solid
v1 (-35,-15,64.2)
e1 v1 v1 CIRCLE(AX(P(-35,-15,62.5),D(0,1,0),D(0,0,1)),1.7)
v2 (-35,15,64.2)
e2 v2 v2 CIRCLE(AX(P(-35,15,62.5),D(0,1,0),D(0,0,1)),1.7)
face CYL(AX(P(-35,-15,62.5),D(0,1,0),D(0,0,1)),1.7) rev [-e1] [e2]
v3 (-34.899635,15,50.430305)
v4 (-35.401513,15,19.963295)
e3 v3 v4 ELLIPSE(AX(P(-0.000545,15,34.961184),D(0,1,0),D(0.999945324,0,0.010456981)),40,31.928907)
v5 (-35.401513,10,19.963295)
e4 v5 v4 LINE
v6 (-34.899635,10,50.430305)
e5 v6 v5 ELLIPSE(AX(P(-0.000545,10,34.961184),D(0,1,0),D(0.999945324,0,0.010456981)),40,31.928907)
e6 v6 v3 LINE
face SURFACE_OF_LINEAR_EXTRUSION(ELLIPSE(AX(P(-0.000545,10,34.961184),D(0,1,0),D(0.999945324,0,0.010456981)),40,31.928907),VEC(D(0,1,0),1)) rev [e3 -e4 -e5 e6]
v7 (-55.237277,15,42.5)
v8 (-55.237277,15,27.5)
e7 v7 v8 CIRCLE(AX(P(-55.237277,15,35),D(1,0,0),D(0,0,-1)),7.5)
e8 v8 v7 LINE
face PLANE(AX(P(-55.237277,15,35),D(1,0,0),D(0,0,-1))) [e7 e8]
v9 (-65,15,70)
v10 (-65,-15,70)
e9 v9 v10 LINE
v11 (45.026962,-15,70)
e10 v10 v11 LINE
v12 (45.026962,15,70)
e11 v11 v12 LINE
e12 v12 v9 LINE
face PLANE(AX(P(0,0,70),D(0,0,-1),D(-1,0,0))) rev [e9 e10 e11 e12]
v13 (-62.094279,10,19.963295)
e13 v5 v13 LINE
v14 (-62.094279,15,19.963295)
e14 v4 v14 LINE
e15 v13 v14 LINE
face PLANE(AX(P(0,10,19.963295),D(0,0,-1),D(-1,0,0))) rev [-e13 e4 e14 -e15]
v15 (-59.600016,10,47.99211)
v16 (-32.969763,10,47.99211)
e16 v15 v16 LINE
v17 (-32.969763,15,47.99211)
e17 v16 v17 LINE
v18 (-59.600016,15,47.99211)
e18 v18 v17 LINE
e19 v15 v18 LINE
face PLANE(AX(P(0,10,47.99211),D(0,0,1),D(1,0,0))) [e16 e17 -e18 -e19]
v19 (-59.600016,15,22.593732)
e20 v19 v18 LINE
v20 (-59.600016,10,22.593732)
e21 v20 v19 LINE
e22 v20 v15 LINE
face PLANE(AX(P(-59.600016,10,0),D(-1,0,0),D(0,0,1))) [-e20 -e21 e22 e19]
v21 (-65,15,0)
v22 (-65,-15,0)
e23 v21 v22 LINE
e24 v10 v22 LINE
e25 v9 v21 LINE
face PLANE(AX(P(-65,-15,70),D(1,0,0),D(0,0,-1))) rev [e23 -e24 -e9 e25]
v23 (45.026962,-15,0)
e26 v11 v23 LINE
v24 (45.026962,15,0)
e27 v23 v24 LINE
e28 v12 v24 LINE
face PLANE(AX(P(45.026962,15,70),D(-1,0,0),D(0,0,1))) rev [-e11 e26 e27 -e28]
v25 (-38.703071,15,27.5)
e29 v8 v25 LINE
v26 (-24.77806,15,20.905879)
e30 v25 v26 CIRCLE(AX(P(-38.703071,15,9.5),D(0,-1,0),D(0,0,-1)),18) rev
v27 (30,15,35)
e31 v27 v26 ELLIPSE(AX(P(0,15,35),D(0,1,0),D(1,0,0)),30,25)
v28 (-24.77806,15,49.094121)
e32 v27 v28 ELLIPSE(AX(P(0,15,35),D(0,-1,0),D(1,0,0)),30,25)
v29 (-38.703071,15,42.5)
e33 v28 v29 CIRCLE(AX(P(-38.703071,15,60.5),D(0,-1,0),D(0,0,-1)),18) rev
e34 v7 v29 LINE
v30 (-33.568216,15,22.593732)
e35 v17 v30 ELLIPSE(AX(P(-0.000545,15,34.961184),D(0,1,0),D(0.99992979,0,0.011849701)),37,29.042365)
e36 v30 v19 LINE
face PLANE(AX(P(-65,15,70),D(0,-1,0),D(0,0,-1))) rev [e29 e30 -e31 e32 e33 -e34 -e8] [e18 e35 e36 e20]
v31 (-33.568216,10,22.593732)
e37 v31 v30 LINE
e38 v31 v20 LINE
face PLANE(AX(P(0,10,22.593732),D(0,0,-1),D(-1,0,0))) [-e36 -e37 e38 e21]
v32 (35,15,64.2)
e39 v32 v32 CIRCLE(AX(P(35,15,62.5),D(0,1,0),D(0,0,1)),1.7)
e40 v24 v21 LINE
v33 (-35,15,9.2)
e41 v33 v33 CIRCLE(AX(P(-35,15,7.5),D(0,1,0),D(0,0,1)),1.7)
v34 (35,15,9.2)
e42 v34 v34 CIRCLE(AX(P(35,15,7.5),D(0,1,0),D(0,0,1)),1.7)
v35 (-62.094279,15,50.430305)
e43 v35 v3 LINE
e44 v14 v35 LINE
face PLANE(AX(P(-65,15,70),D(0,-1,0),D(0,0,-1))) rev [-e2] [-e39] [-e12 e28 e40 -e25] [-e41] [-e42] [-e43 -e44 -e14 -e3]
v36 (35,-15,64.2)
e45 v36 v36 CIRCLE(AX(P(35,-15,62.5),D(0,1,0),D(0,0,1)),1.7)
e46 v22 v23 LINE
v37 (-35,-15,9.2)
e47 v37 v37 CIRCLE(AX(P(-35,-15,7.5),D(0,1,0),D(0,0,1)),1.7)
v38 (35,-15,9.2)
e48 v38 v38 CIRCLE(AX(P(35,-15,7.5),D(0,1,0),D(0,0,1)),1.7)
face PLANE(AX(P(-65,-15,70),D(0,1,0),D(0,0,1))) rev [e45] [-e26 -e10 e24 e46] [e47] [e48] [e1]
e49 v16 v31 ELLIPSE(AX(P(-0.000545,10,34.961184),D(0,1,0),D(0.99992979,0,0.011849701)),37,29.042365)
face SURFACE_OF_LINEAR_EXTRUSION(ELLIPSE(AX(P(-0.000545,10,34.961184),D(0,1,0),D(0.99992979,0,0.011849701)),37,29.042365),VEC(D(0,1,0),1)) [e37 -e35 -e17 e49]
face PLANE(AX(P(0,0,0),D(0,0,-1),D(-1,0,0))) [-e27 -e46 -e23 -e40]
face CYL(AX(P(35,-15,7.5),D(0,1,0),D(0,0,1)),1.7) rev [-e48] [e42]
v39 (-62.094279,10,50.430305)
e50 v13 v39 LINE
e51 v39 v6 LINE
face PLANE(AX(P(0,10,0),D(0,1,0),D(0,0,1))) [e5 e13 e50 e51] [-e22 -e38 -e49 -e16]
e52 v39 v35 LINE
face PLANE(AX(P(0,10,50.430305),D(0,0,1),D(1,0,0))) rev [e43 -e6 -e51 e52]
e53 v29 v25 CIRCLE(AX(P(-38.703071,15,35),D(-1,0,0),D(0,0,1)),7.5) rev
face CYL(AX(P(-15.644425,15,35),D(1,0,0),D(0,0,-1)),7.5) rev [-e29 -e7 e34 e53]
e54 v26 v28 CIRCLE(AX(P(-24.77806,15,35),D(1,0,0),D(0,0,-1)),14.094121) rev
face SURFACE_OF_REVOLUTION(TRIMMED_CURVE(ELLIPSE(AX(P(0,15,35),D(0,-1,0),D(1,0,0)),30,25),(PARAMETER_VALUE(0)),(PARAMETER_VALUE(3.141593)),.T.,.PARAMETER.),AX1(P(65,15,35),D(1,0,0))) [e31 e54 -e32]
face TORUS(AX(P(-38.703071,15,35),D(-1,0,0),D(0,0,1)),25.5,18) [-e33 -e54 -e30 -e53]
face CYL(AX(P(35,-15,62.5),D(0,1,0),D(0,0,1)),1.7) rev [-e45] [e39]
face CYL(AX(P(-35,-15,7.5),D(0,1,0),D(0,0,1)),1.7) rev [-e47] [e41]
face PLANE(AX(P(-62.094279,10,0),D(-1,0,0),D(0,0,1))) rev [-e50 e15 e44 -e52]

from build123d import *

# Parameters (mm, degrees)
ESQUISSE1_W                              = 130
ESQUISSE1_H                              = 30
BOSS_EXTRU_1_DEPTH                       = 70
ENL_VEMENT_DE_MATI_RE_R_VOLUTION47_ANGLE = 180
ENL_VEMENT_START                         = -55.237277286
ENL_VEMENT_DE_MATI_RE_R_VOLUTION48_DEPTH = 26.619101243
CONG_1_R                                 = 18
ESQUISSE10_W                             = 19.973037842
ESQUISSE10_H                             = 30
ENL_V_MAT_EXTRU_2_DEPTH                  = 97.695398184
ENL_V_MAT_EXTRU_5_DEPTH                  = 5
ESQUISSE15_R                             = 1.7
ENL_V_MAT_EXTRU_7_DEPTH                  = 101.124922107


# Read off the part's stored shape, not the designer's step: Enlèvement de matière-Révolution48
with BuildPart() as part:
    # Esquisse1 → Boss.-Extru.1 (new body)
    with BuildSketch(Plane.XY):
        Rectangle(ESQUISSE1_W, ESQUISSE1_H)
    extrude(amount=BOSS_EXTRU_1_DEPTH)

    # Esquisse6 → Enlèvement de matière-Révolution47 (revolve, cut)
    with BuildSketch(Plane(origin=(0, 15, 0), x_dir=(1, 0, 0), z_dir=(0, 1, 0))):
        with BuildLine():
            Line((-30, -35), (30, -35))
            add(Edge.make_bspline(
                [(30, -35), (30, -10), (0, -10), (-30, -10), (-30, -35)],
                knots=[0, 0, 0, 1.570796327, 1.570796327, 3.141592654, 3.141592654, 3.141592654], degree=2, weights=[1, 0.707106781, 1, 0.707106781, 1]))
        make_face()
    revolve(axis=Axis((65, 15, 35), (-1, 0, 0)), revolution_arc=ENL_VEMENT_DE_MATI_RE_R_VOLUTION47_ANGLE, mode=Mode.SUBTRACT)

    # Enlèvement de matière-Révolution48 outli → Enlèvement de matière-Révolution48 (cut)
    with BuildSketch(Plane.YZ.offset(ENL_VEMENT_START)):
        with BuildLine():
            Line((15, 27.5), (15, 42.5))
            ThreePointArc((15, 42.5), (7.5, 35), (15, 27.5))
        make_face()
    extrude(amount=ENL_VEMENT_DE_MATI_RE_R_VOLUTION48_DEPTH, mode=Mode.SUBTRACT)

    # Congé1
    cong_1_edges = [part.edges().sort_by_distance(p)[0] for p in [
        (-28.618176043, 7.5, 35),
    ]]
    fillet(cong_1_edges, radius=CONG_1_R)

    # Esquisse10 → Enlèv. mat.-Extru.2 (cut, through all)
    with BuildSketch(Plane(origin=(0, 0, 0), x_dir=(-1, 0, 0), z_dir=(0, 0, -1))):
        with Locations((-55.013481079, 0)):
            Rectangle(ESQUISSE10_W, ESQUISSE10_H)
    extrude(amount=-ENL_V_MAT_EXTRU_2_DEPTH, mode=Mode.SUBTRACT)

    # Esquisse14 → Enlèv. mat.-Extru.5 (cut)
    with BuildSketch(Plane(origin=(0, 15, 0), x_dir=(1, 0, 0), z_dir=(0, 1, 0))):
        with BuildLine():
            Line((-36.95065792, -22.593731953), (-33.568216071, -22.593731953))
            add(Edge.make_bspline(
                [(-32.969763, -47.992109896), (-11.968044376, -80.456384186), (23.634832969, -57.413436774), (59.237710315, -34.370489362), (22.565908506, -12.048229698), (-14.105893303, 10.274029966), (-33.568216071, -22.593731953)],
                knots=[3.621962513, 3.621962513, 3.621962513, 5.414642661, 5.414642661, 7.207322809, 7.207322809, 9.000002957, 9.000002957, 9.000002957], degree=2, weights=[1, 0.624472717, 1, 0.624472717, 1, 0.624472717, 1]))
            Line((-32.969763, -47.992109896), (-36.439122288, -47.992109896))
            add(Edge.make_bspline(
                [(-36.439122288, -47.992109896), (-35.734455038, -49.237206185), (-34.899635372, -50.4303054)],
                knots=[3.575076272, 3.575076272, 3.575076272, 3.671550289, 3.671550289, 3.671550289], degree=2, weights=[1, 0.979509213, 0.961188751]))
            add(Edge.make_bspline(
                [(-34.899635372, -50.4303054), (-11.819428822, -83.415843998), (25.026969924, -59.963213412), (65.234193612, -34.371427073), (24.010934913, -9.515816182), (-13.543091018, 13.127426623), (-35.401513383, -19.963295045)],
                knots=[3.671550289, 3.671550289, 3.671550289, 5.396765185, 5.396765185, 7.218454098, 7.218454098, 8.937188842, 8.937188842, 8.937188842], degree=2, weights=[0.961188751, 0.633569616, 1, 0.613078829, 1, 0.634945981, 0.958737375]))
            add(Edge.make_bspline(
                [(-35.401513383, -19.963295045), (-36.251462308, -21.250003794), (-36.95065792, -22.593731953)],
                knots=[8.937188842, 8.937188842, 8.937188842, 9.04014301, 9.04014301, 9.04014301], degree=2, weights=[0.958737375, 0.978132848, 1]))
        make_face()
        with BuildLine():
            Line((-59.600015614, -22.593731953), (-36.95065792, -22.593731953))
            add(Edge.make_bspline(
                [(-35.401513383, -19.963295045), (-36.251462308, -21.250003794), (-36.95065792, -22.593731953)],
                knots=[8.937188842, 8.937188842, 8.937188842, 9.04014301, 9.04014301, 9.04014301], degree=2, weights=[0.958737375, 0.978132848, 1]))
            Line((-35.401513383, -19.963295045), (-62.094279206, -19.963295045))
            Line((-62.094279206, -19.963295045), (-62.094279206, -50.4303054))
            Line((-62.094279206, -50.4303054), (-34.899635372, -50.4303054))
            add(Edge.make_bspline(
                [(-36.439122288, -47.992109896), (-35.734455038, -49.237206185), (-34.899635372, -50.4303054)],
                knots=[3.575076272, 3.575076272, 3.575076272, 3.671550289, 3.671550289, 3.671550289], degree=2, weights=[1, 0.979509213, 0.961188751]))
            Line((-36.439122288, -47.992109896), (-59.600015614, -47.992109896))
            Line((-59.600015614, -47.992109896), (-59.600015614, -22.593731953))
        make_face()
    extrude(amount=-ENL_V_MAT_EXTRU_5_DEPTH, mode=Mode.SUBTRACT)

    # Esquisse15 → Enlèv. mat.-Extru.7 (cut, through all)
    with BuildSketch(Plane(origin=(0, 15, 0), x_dir=(1, 0, 0), z_dir=(0, 1, 0))):
        with Locations(Location((35, -7.5, 0), (0, 0, 270))):
            Circle(ESQUISSE15_R)
        with Locations(Location((35, -62.5, 0), (0, 0, 270))):
            Circle(ESQUISSE15_R)
        with Locations(Location((-35, -62.5, 0), (0, 0, 270))):
            Circle(ESQUISSE15_R)
        with Locations(Location((-35, -7.5, 0), (0, 0, 270))):
            Circle(ESQUISSE15_R)
    extrude(amount=-ENL_V_MAT_EXTRU_7_DEPTH, mode=Mode.SUBTRACT)


solid = part.part
